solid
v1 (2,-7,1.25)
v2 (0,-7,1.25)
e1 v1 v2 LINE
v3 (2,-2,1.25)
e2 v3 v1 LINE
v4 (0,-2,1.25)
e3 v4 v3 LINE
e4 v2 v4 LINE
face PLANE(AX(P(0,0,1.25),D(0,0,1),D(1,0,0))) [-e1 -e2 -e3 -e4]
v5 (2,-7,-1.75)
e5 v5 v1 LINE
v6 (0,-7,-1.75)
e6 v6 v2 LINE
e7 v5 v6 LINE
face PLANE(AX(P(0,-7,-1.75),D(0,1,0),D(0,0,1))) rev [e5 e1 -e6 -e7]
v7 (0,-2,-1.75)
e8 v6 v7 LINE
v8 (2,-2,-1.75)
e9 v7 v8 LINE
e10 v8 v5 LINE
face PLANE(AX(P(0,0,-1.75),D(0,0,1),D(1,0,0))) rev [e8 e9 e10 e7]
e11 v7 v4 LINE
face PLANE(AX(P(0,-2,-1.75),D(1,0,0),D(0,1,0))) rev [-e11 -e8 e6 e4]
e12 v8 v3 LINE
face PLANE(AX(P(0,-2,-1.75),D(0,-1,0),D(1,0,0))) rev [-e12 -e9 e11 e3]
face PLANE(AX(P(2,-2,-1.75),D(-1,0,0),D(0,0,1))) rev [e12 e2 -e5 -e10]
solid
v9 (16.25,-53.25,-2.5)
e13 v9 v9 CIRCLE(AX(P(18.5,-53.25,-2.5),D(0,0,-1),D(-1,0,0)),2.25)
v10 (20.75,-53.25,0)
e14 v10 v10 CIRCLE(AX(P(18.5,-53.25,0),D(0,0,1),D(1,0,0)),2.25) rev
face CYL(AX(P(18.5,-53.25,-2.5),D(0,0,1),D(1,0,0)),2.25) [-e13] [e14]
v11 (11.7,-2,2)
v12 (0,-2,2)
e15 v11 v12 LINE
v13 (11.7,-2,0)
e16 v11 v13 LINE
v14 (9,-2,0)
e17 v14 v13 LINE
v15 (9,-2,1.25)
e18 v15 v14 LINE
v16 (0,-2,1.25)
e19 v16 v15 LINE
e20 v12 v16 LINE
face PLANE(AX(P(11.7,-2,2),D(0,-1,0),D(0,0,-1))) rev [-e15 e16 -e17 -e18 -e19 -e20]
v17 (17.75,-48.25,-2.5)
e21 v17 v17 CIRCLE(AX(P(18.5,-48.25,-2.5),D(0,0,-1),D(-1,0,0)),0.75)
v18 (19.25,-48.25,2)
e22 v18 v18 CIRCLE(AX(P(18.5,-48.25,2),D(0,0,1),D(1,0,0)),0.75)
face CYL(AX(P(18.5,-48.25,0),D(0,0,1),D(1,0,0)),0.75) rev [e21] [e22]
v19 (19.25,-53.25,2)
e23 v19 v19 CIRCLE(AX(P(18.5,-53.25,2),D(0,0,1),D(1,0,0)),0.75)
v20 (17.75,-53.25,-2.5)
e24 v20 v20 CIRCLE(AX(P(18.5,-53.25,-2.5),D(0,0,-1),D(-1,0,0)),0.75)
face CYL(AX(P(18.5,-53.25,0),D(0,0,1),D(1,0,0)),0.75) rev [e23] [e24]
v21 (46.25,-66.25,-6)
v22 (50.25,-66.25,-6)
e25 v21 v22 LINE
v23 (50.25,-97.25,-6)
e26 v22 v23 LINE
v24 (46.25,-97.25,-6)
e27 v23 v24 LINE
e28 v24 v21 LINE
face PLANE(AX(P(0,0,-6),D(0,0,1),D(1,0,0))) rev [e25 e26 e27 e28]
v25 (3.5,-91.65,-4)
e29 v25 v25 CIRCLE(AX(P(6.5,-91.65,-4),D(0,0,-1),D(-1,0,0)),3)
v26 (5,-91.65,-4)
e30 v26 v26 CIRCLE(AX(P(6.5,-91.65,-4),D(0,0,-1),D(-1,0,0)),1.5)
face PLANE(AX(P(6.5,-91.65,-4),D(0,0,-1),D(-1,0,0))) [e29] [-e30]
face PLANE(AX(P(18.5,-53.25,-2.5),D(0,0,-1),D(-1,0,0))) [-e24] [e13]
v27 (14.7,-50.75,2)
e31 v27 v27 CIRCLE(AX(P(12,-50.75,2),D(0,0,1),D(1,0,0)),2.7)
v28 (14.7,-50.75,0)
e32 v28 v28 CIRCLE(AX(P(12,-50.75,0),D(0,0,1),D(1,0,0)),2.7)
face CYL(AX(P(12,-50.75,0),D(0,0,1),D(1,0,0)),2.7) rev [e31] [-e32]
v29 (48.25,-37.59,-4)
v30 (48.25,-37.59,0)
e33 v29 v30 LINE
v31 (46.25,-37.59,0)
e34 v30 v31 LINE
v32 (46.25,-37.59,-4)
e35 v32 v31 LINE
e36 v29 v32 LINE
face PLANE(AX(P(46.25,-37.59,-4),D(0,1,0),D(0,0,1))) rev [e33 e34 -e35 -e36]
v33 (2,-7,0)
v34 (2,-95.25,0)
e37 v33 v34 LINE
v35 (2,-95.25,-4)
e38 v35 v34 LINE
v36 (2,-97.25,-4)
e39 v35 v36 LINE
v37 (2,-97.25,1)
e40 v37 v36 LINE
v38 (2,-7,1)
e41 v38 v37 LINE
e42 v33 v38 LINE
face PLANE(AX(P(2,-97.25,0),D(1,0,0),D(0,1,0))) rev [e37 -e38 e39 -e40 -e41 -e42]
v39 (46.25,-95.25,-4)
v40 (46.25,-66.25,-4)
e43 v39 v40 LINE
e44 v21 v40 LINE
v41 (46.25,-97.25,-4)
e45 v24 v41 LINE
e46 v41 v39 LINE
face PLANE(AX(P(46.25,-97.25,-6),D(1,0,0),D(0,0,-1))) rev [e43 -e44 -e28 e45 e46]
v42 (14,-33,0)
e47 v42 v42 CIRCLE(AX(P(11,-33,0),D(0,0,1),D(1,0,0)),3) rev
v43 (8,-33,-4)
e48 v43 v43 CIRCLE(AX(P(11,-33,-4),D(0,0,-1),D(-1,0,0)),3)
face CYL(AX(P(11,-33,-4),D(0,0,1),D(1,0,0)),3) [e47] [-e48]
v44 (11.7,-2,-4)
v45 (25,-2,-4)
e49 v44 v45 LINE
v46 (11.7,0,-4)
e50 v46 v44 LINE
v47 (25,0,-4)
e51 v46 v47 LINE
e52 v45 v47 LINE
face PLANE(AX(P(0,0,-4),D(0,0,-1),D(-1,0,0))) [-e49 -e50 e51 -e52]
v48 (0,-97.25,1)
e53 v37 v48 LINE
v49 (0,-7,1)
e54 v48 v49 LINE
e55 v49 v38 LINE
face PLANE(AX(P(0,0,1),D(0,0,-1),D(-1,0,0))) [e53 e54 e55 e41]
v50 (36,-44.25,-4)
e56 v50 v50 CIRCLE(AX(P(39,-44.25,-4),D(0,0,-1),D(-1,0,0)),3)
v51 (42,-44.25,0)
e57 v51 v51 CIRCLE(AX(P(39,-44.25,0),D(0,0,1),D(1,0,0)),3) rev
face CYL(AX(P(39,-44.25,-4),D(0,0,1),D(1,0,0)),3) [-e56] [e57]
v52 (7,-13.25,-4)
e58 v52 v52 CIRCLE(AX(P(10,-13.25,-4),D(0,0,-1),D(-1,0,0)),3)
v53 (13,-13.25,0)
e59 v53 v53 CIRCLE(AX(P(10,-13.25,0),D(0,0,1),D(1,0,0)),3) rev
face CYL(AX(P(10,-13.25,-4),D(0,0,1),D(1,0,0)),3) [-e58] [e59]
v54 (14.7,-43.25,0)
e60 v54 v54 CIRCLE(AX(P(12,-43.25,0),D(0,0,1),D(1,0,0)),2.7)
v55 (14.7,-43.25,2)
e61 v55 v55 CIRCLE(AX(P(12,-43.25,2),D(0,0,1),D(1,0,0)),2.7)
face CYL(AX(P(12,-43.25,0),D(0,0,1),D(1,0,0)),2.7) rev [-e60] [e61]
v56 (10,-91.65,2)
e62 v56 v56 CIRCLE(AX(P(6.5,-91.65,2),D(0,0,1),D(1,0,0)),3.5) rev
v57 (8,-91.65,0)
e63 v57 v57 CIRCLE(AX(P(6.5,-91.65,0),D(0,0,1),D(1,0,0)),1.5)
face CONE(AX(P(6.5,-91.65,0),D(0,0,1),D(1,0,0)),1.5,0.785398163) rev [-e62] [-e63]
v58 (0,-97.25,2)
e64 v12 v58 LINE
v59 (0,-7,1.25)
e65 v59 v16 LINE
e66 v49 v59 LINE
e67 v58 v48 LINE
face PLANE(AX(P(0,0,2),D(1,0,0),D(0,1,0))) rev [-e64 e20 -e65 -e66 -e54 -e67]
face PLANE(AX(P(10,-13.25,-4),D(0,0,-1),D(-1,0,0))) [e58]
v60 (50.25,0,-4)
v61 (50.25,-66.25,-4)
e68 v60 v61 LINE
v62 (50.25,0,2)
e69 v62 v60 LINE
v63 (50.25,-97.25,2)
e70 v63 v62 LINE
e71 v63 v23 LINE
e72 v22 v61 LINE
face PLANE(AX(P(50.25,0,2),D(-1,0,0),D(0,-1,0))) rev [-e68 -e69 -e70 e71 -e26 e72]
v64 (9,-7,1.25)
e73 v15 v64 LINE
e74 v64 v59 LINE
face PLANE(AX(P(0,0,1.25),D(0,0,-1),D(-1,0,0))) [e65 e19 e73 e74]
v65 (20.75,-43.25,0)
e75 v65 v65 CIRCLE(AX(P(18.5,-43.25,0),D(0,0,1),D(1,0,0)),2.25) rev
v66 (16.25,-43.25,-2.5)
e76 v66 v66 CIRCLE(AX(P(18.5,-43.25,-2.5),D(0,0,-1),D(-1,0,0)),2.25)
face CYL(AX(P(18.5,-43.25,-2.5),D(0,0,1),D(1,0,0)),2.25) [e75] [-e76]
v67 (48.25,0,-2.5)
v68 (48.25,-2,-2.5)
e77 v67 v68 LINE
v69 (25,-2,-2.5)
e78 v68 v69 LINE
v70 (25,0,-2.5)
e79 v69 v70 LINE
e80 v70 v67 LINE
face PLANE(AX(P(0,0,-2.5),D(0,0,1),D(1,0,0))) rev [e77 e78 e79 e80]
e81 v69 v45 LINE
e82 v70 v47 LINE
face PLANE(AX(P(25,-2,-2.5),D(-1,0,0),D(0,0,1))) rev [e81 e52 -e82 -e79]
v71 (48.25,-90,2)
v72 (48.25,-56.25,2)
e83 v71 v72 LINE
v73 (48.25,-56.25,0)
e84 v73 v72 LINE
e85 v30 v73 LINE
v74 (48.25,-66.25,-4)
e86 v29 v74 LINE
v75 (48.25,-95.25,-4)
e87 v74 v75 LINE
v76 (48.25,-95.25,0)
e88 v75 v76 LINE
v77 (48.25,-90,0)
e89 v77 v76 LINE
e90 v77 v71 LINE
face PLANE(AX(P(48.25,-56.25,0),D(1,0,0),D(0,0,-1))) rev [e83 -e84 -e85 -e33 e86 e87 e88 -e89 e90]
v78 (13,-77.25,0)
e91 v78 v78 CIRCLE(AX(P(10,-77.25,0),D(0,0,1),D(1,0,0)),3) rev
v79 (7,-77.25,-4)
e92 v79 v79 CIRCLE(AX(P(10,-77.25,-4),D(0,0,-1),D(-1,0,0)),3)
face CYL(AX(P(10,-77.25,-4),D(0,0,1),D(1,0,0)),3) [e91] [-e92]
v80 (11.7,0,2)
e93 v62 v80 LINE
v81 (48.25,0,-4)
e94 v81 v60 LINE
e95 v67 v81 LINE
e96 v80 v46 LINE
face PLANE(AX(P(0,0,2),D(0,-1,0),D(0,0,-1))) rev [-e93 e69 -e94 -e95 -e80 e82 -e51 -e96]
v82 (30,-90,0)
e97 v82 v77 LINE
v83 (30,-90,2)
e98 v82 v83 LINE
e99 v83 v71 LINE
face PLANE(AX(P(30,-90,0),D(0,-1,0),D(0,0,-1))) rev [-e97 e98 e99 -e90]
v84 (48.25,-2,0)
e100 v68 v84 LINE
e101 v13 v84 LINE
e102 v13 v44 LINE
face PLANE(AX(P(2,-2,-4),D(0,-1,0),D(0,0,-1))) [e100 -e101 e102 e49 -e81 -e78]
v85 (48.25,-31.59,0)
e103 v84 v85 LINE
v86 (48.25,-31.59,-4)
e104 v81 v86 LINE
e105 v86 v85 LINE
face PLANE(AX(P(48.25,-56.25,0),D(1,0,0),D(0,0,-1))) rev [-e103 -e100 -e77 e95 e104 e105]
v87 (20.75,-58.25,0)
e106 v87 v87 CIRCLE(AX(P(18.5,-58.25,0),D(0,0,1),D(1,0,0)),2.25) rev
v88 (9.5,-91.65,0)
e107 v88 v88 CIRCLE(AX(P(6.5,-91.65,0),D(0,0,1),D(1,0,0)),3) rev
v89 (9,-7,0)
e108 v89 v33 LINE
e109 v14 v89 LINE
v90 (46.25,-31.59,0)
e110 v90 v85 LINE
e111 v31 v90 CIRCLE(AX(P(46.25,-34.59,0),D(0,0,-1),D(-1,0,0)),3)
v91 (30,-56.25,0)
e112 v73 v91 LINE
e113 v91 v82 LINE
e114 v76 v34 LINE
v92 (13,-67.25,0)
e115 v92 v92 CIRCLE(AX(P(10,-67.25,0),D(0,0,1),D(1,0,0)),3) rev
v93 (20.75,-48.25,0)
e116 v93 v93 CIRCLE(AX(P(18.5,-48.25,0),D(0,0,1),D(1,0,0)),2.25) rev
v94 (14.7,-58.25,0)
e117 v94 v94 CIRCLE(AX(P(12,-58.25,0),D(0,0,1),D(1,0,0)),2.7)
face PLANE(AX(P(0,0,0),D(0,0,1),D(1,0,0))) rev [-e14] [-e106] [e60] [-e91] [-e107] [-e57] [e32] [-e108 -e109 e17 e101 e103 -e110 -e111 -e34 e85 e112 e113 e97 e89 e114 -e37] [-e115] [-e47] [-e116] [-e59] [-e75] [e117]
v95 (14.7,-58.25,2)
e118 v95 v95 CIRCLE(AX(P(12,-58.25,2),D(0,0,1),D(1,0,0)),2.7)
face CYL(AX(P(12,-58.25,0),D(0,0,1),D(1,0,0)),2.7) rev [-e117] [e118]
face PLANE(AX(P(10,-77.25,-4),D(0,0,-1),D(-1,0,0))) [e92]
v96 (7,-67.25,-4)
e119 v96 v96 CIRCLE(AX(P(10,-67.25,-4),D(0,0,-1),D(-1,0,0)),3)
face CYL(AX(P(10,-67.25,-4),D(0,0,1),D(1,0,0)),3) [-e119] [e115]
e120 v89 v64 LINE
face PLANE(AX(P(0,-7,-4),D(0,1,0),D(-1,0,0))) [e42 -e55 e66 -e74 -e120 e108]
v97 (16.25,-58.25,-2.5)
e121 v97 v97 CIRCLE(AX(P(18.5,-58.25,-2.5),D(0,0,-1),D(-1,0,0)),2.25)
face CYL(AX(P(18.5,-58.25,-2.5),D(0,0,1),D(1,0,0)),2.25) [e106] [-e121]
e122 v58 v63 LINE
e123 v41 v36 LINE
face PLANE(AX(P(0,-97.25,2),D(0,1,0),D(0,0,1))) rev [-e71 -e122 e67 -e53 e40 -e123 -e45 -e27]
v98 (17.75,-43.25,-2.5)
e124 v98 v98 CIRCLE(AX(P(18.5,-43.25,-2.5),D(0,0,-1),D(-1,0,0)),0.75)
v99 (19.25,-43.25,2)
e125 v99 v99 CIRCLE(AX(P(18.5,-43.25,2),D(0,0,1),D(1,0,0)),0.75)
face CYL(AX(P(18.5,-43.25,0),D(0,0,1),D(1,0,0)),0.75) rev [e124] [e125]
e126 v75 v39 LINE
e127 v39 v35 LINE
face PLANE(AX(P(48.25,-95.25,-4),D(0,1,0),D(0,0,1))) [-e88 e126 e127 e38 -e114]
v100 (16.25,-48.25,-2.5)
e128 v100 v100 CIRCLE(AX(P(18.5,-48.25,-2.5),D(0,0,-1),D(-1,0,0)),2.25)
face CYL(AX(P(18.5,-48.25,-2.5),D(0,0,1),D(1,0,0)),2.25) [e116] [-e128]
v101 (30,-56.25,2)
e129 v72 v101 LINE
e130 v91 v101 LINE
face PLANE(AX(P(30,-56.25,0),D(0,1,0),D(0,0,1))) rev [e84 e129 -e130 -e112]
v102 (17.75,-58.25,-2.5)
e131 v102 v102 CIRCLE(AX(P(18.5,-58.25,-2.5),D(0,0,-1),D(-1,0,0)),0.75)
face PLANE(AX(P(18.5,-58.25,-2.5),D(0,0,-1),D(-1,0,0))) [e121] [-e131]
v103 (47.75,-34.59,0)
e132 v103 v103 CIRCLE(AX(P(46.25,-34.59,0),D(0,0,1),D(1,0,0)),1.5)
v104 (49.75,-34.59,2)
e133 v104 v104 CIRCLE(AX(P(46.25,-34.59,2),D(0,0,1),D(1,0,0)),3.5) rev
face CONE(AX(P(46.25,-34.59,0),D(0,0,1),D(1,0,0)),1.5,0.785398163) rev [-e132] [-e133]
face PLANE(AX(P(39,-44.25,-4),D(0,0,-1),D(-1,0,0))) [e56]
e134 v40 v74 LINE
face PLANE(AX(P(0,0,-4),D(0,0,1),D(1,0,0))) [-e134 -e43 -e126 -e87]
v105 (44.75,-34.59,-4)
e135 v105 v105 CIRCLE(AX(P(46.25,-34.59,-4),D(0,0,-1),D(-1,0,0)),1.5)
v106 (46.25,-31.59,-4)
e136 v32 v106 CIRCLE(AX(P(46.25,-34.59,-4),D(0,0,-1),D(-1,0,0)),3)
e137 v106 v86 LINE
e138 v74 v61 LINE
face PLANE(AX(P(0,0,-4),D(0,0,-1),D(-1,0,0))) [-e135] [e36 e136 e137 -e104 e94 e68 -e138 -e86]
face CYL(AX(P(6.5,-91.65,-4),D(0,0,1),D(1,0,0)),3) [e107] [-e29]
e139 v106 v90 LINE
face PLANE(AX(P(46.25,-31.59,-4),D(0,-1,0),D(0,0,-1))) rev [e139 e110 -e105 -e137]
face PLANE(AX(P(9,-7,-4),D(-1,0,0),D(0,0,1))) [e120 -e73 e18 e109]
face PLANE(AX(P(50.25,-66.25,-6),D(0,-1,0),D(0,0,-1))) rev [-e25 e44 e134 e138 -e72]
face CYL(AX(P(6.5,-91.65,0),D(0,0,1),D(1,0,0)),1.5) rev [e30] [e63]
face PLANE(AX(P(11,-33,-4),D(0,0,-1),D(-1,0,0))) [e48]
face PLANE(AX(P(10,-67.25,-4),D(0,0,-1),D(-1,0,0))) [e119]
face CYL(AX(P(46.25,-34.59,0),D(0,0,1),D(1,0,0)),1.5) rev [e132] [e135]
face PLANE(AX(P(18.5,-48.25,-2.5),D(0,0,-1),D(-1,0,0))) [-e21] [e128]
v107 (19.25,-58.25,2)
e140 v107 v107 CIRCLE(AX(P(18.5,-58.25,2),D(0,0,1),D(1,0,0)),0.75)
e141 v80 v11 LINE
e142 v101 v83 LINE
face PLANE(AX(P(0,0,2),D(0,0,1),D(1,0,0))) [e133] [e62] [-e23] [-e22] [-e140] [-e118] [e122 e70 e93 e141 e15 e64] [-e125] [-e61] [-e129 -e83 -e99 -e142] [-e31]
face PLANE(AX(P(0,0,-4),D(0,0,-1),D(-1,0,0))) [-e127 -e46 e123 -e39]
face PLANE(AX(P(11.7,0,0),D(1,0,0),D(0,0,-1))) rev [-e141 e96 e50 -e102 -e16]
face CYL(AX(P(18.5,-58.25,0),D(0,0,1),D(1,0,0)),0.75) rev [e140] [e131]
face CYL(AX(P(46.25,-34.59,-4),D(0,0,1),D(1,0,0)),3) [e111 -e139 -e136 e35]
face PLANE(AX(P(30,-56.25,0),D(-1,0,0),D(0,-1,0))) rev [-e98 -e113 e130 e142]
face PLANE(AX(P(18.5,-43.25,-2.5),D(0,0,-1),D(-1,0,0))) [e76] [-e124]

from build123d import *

# Parameters (mm, degrees)
SKETCH1_W               = 50.25
SKETCH1_H               = 97.25
BOSS_EXTRUDE1_DEPTH     = 2
SKETCH2_R               = 2.7
SKETCH2_R_2             = 1.5
SKETCH2_R_3             = 0.75
SKETCH2_W               = 18.25
SKETCH2_H               = 33.75
CUT_EXTRUDE1_DEPTH      = 110.483446237
SKETCH3_W               = 50.25
SKETCH3_H               = 97.25
SKETCH3_W_2             = 46.25
SKETCH3_H_2             = 93.25
BOSS_EXTRUDE2_DEPTH     = 4
SKETCH4_R               = 3
SKETCH4_R_2             = 1.5
BOSS_EXTRUDE3_DEPTH     = 4
CUT_EXTRUDE2_DEPTH      = 4
SKETCH7_W               = 2
SKETCH7_H               = 97.25
CUT_EXTRUDE3_DEPTH      = 1
CUT_EXTRUDE4_DEPTH      = 110.538235334
CUT_EXTRUDE4_DEPTH_BACK = 110.538235334
SKETCH8_W               = 11.7
SKETCH8_H               = 2
CUT_EXTRUDE5_DEPTH      = 110.538235334
CUT_EXTRUDE5_DEPTH_BACK = 1.25
SKETCH9_W               = 9
SKETCH9_H               = 7
SKETCH10_R              = 2.25
SKETCH10_R_2            = 0.75
BOSS_EXTRUDE4_DEPTH     = 2.5
SKETCH11_W              = 23.25
SKETCH11_H              = 2
CUT_EXTRUDE6_DEPTH      = 1.5
CHAMFER1_SIZE           = 2
SKETCH12_R              = 3
BOSS_EXTRUDE5_DEPTH     = 4
SKETCH13_W              = 4
SKETCH13_H              = 31
BOSS_EXTRUDE6_DEPTH     = 2
SKETCH14_W              = 2
SKETCH14_H              = 5
BOSS_EXTRUDE9_DEPTH     = 3


with BuildPart() as part:
    # Sketch1 → Boss-Extrude1 (new body)
    with BuildSketch(Plane.XY):
        with Locations((25.125, -48.625)):
            Rectangle(SKETCH1_W, SKETCH1_H)
    extrude(amount=BOSS_EXTRUDE1_DEPTH)

    # Sketch2 → Cut-Extrude1 (cut, through all)
    with BuildSketch(Plane.XY.offset(2)):
        with Locations((12, -43.25)):
            Circle(SKETCH2_R)
        with Locations((12, -50.75)):
            Circle(SKETCH2_R)
        with Locations((12, -58.25)):
            Circle(SKETCH2_R)
        with Locations((46.25, -34.59)):
            Circle(SKETCH2_R_2)
        with Locations((6.5, -91.65)):
            Circle(SKETCH2_R_2)
        with Locations((18.5, -43.25)):
            Circle(SKETCH2_R_3)
        with Locations((18.5, -48.25)):
            Circle(SKETCH2_R_3)
        with Locations((18.5, -53.25)):
            Circle(SKETCH2_R_3)
        with Locations((18.5, -58.25)):
            Circle(SKETCH2_R_3)
        with Locations((39.125, -73.125)):
            Rectangle(SKETCH2_W, SKETCH2_H)
    extrude(amount=-CUT_EXTRUDE1_DEPTH, mode=Mode.SUBTRACT)

    # Sketch3 → Boss-Extrude2 (add)
    with BuildSketch(Plane(origin=(0, 0, 0), x_dir=(-1, 0, 0), z_dir=(0, 0, -1))):
        with Locations((-25.125, -48.625)):
            Rectangle(SKETCH3_W, SKETCH3_H)
        with Locations((-25.125, -48.625)):
            Rectangle(SKETCH3_W_2, SKETCH3_H_2, mode=Mode.SUBTRACT)
    extrude(amount=BOSS_EXTRUDE2_DEPTH)

    # Sketch4 → Boss-Extrude3 (add)
    # profile 1 of 2: a face of its own
    with BuildSketch(Plane(origin=(0, 0, 0), x_dir=(-1, 0, 0), z_dir=(0, 0, -1))):
        with Locations(Location((-6.5, -91.65, 0), (0, 0, 180))):
            Circle(SKETCH4_R)
        with Locations(Location((-6.5, -91.65, 0), (0, 0, 180))):
            Circle(SKETCH4_R_2, mode=Mode.SUBTRACT)
    # profile 2 of 2: a face of its own
    with BuildSketch(Plane(origin=(0, 0, 0), x_dir=(-1, 0, 0), z_dir=(0, 0, -1))):
        with BuildLine():
            Line((-46.25, -31.59), (-48.25, -31.59))
            Line((-48.25, -31.59), (-48.25, -37.59))
            Line((-48.25, -37.59), (-46.25, -37.59))
            ThreePointArc((-46.25, -37.59), (-43.25, -34.59), (-46.25, -31.59))
        make_face()
        with Locations(Location((-46.25, -34.59, 0), (0, 0, 180))):
            Circle(SKETCH4_R_2, mode=Mode.SUBTRACT)
    extrude(amount=BOSS_EXTRUDE3_DEPTH)

    # Sketch6 → Cut-Extrude2 (cut)
    with BuildSketch(Plane(origin=(0, 0, -4), x_dir=(-1, 0, 0), z_dir=(0, 0, -1))):
        Polygon((-11.7, 0), (0, 0), (0, -97.25), (-2, -97.25), (-2, -2), (-11.7, -2), align=None)
    extrude(amount=-CUT_EXTRUDE2_DEPTH, mode=Mode.SUBTRACT)

    # Sketch7 → Cut-Extrude3 (cut)
    with BuildSketch(Plane(origin=(0, 0, 0), x_dir=(-1, 0, 0), z_dir=(0, 0, -1))):
        with Locations((-1, -48.625)):
            Rectangle(SKETCH7_W, SKETCH7_H)
    extrude(amount=-CUT_EXTRUDE3_DEPTH, mode=Mode.SUBTRACT)

    # Sketch8 → Cut-Extrude4 (cut, two sides: drawn at the far end of the back side and taken through both)
    with BuildSketch(Plane(origin=(0, 0, 0), x_dir=(-1, 0, 0), z_dir=(0, 0, -1)).offset(-CUT_EXTRUDE4_DEPTH_BACK)):
        with Locations((-5.85, -1)):
            Rectangle(SKETCH8_W, SKETCH8_H)
    extrude(amount=CUT_EXTRUDE4_DEPTH + CUT_EXTRUDE4_DEPTH_BACK, mode=Mode.SUBTRACT)

    # Sketch9 → Cut-Extrude5 (cut, two sides: drawn at the far end of the back side and taken through both)
    with BuildSketch(Plane(origin=(0, 0, 0), x_dir=(-1, 0, 0), z_dir=(0, 0, -1)).offset(-CUT_EXTRUDE5_DEPTH_BACK)):
        with Locations((-4.5, -3.5)):
            Rectangle(SKETCH9_W, SKETCH9_H)
    extrude(amount=CUT_EXTRUDE5_DEPTH + CUT_EXTRUDE5_DEPTH_BACK, mode=Mode.SUBTRACT)

    # Sketch10 → Boss-Extrude4 (add)
    # profile 1 of 4: a face of its own
    with BuildSketch(Plane(origin=(0, 0, 0), x_dir=(-1, 0, 0), z_dir=(0, 0, -1))):
        with Locations(Location((-18.5, -58.25, 0), (0, 0, 180))):
            Circle(SKETCH10_R)
        with Locations(Location((-18.5, -58.25, 0), (0, 0, 180))):
            Circle(SKETCH10_R_2, mode=Mode.SUBTRACT)
    # profile 2 of 4: a face of its own
    with BuildSketch(Plane(origin=(0, 0, 0), x_dir=(-1, 0, 0), z_dir=(0, 0, -1))):
        with Locations(Location((-18.5, -53.25, 0), (0, 0, 180))):
            Circle(SKETCH10_R)
        with Locations(Location((-18.5, -53.25, 0), (0, 0, 180))):
            Circle(SKETCH10_R_2, mode=Mode.SUBTRACT)
    # profile 3 of 4: a face of its own
    with BuildSketch(Plane(origin=(0, 0, 0), x_dir=(-1, 0, 0), z_dir=(0, 0, -1))):
        with Locations(Location((-18.5, -48.25, 0), (0, 0, 180))):
            Circle(SKETCH10_R)
        with Locations(Location((-18.5, -48.25, 0), (0, 0, 180))):
            Circle(SKETCH10_R_2, mode=Mode.SUBTRACT)
    # profile 4 of 4: a face of its own
    with BuildSketch(Plane(origin=(0, 0, 0), x_dir=(-1, 0, 0), z_dir=(0, 0, -1))):
        with Locations(Location((-18.5, -43.25, 0), (0, 0, 180))):
            Circle(SKETCH10_R)
        with Locations(Location((-18.5, -43.25, 0), (0, 0, 180))):
            Circle(SKETCH10_R_2, mode=Mode.SUBTRACT)
    extrude(amount=BOSS_EXTRUDE4_DEPTH)

    # Sketch11 → Cut-Extrude6 (cut)
    with BuildSketch(Plane(origin=(0, 0, -4), x_dir=(-1, 0, 0), z_dir=(0, 0, -1))):
        with Locations((-36.625, -1)):
            Rectangle(SKETCH11_W, SKETCH11_H)
    extrude(amount=-CUT_EXTRUDE6_DEPTH, mode=Mode.SUBTRACT)

    # Chamfer1
    chamfer1_edges = [part.edges().sort_by_distance(p)[0] for p in [
        (5, -91.65, 2),
        (44.75, -34.59, 2),
    ]]
    chamfer(chamfer1_edges, length=CHAMFER1_SIZE - 0.0001)  # a hair under: the kernel refuses the full size

    # Sketch12 → Boss-Extrude5 (add)
    with BuildSketch(Plane(origin=(0, 0, 0), x_dir=(-1, 0, 0), z_dir=(0, 0, -1))):
        with Locations(Location((-10, -13.25, 0), (0, 0, 180))):
            Circle(SKETCH12_R)
        with Locations(Location((-11, -33, 0), (0, 0, 180))):
            Circle(SKETCH12_R)
        with Locations(Location((-10, -67.25, 0), (0, 0, 180))):
            Circle(SKETCH12_R)
        with Locations(Location((-10, -77.25, 0), (0, 0, 180))):
            Circle(SKETCH12_R)
        with Locations(Location((-39, -44.25, 0), (0, 0, 180))):
            Circle(SKETCH12_R)
    extrude(amount=BOSS_EXTRUDE5_DEPTH)

    # Sketch13 → Boss-Extrude6 (add)
    with BuildSketch(Plane(origin=(0, 0, -4), x_dir=(-1, 0, 0), z_dir=(0, 0, -1))):
        with Locations((-48.25, -81.75)):
            Rectangle(SKETCH13_W, SKETCH13_H)
    extrude(amount=BOSS_EXTRUDE6_DEPTH)


with BuildPart() as body_2:
    # Sketch14 → Boss-Extrude9 (new body)
    with BuildSketch(Plane(origin=(0, 0, 1.25), x_dir=(-1, 0, 0), z_dir=(0, 0, -1))):
        with Locations((-1, -4.5)):
            Rectangle(SKETCH14_W, SKETCH14_H)
    extrude(amount=BOSS_EXTRUDE9_DEPTH)


solid = Compound([part.part, body_2.part])
